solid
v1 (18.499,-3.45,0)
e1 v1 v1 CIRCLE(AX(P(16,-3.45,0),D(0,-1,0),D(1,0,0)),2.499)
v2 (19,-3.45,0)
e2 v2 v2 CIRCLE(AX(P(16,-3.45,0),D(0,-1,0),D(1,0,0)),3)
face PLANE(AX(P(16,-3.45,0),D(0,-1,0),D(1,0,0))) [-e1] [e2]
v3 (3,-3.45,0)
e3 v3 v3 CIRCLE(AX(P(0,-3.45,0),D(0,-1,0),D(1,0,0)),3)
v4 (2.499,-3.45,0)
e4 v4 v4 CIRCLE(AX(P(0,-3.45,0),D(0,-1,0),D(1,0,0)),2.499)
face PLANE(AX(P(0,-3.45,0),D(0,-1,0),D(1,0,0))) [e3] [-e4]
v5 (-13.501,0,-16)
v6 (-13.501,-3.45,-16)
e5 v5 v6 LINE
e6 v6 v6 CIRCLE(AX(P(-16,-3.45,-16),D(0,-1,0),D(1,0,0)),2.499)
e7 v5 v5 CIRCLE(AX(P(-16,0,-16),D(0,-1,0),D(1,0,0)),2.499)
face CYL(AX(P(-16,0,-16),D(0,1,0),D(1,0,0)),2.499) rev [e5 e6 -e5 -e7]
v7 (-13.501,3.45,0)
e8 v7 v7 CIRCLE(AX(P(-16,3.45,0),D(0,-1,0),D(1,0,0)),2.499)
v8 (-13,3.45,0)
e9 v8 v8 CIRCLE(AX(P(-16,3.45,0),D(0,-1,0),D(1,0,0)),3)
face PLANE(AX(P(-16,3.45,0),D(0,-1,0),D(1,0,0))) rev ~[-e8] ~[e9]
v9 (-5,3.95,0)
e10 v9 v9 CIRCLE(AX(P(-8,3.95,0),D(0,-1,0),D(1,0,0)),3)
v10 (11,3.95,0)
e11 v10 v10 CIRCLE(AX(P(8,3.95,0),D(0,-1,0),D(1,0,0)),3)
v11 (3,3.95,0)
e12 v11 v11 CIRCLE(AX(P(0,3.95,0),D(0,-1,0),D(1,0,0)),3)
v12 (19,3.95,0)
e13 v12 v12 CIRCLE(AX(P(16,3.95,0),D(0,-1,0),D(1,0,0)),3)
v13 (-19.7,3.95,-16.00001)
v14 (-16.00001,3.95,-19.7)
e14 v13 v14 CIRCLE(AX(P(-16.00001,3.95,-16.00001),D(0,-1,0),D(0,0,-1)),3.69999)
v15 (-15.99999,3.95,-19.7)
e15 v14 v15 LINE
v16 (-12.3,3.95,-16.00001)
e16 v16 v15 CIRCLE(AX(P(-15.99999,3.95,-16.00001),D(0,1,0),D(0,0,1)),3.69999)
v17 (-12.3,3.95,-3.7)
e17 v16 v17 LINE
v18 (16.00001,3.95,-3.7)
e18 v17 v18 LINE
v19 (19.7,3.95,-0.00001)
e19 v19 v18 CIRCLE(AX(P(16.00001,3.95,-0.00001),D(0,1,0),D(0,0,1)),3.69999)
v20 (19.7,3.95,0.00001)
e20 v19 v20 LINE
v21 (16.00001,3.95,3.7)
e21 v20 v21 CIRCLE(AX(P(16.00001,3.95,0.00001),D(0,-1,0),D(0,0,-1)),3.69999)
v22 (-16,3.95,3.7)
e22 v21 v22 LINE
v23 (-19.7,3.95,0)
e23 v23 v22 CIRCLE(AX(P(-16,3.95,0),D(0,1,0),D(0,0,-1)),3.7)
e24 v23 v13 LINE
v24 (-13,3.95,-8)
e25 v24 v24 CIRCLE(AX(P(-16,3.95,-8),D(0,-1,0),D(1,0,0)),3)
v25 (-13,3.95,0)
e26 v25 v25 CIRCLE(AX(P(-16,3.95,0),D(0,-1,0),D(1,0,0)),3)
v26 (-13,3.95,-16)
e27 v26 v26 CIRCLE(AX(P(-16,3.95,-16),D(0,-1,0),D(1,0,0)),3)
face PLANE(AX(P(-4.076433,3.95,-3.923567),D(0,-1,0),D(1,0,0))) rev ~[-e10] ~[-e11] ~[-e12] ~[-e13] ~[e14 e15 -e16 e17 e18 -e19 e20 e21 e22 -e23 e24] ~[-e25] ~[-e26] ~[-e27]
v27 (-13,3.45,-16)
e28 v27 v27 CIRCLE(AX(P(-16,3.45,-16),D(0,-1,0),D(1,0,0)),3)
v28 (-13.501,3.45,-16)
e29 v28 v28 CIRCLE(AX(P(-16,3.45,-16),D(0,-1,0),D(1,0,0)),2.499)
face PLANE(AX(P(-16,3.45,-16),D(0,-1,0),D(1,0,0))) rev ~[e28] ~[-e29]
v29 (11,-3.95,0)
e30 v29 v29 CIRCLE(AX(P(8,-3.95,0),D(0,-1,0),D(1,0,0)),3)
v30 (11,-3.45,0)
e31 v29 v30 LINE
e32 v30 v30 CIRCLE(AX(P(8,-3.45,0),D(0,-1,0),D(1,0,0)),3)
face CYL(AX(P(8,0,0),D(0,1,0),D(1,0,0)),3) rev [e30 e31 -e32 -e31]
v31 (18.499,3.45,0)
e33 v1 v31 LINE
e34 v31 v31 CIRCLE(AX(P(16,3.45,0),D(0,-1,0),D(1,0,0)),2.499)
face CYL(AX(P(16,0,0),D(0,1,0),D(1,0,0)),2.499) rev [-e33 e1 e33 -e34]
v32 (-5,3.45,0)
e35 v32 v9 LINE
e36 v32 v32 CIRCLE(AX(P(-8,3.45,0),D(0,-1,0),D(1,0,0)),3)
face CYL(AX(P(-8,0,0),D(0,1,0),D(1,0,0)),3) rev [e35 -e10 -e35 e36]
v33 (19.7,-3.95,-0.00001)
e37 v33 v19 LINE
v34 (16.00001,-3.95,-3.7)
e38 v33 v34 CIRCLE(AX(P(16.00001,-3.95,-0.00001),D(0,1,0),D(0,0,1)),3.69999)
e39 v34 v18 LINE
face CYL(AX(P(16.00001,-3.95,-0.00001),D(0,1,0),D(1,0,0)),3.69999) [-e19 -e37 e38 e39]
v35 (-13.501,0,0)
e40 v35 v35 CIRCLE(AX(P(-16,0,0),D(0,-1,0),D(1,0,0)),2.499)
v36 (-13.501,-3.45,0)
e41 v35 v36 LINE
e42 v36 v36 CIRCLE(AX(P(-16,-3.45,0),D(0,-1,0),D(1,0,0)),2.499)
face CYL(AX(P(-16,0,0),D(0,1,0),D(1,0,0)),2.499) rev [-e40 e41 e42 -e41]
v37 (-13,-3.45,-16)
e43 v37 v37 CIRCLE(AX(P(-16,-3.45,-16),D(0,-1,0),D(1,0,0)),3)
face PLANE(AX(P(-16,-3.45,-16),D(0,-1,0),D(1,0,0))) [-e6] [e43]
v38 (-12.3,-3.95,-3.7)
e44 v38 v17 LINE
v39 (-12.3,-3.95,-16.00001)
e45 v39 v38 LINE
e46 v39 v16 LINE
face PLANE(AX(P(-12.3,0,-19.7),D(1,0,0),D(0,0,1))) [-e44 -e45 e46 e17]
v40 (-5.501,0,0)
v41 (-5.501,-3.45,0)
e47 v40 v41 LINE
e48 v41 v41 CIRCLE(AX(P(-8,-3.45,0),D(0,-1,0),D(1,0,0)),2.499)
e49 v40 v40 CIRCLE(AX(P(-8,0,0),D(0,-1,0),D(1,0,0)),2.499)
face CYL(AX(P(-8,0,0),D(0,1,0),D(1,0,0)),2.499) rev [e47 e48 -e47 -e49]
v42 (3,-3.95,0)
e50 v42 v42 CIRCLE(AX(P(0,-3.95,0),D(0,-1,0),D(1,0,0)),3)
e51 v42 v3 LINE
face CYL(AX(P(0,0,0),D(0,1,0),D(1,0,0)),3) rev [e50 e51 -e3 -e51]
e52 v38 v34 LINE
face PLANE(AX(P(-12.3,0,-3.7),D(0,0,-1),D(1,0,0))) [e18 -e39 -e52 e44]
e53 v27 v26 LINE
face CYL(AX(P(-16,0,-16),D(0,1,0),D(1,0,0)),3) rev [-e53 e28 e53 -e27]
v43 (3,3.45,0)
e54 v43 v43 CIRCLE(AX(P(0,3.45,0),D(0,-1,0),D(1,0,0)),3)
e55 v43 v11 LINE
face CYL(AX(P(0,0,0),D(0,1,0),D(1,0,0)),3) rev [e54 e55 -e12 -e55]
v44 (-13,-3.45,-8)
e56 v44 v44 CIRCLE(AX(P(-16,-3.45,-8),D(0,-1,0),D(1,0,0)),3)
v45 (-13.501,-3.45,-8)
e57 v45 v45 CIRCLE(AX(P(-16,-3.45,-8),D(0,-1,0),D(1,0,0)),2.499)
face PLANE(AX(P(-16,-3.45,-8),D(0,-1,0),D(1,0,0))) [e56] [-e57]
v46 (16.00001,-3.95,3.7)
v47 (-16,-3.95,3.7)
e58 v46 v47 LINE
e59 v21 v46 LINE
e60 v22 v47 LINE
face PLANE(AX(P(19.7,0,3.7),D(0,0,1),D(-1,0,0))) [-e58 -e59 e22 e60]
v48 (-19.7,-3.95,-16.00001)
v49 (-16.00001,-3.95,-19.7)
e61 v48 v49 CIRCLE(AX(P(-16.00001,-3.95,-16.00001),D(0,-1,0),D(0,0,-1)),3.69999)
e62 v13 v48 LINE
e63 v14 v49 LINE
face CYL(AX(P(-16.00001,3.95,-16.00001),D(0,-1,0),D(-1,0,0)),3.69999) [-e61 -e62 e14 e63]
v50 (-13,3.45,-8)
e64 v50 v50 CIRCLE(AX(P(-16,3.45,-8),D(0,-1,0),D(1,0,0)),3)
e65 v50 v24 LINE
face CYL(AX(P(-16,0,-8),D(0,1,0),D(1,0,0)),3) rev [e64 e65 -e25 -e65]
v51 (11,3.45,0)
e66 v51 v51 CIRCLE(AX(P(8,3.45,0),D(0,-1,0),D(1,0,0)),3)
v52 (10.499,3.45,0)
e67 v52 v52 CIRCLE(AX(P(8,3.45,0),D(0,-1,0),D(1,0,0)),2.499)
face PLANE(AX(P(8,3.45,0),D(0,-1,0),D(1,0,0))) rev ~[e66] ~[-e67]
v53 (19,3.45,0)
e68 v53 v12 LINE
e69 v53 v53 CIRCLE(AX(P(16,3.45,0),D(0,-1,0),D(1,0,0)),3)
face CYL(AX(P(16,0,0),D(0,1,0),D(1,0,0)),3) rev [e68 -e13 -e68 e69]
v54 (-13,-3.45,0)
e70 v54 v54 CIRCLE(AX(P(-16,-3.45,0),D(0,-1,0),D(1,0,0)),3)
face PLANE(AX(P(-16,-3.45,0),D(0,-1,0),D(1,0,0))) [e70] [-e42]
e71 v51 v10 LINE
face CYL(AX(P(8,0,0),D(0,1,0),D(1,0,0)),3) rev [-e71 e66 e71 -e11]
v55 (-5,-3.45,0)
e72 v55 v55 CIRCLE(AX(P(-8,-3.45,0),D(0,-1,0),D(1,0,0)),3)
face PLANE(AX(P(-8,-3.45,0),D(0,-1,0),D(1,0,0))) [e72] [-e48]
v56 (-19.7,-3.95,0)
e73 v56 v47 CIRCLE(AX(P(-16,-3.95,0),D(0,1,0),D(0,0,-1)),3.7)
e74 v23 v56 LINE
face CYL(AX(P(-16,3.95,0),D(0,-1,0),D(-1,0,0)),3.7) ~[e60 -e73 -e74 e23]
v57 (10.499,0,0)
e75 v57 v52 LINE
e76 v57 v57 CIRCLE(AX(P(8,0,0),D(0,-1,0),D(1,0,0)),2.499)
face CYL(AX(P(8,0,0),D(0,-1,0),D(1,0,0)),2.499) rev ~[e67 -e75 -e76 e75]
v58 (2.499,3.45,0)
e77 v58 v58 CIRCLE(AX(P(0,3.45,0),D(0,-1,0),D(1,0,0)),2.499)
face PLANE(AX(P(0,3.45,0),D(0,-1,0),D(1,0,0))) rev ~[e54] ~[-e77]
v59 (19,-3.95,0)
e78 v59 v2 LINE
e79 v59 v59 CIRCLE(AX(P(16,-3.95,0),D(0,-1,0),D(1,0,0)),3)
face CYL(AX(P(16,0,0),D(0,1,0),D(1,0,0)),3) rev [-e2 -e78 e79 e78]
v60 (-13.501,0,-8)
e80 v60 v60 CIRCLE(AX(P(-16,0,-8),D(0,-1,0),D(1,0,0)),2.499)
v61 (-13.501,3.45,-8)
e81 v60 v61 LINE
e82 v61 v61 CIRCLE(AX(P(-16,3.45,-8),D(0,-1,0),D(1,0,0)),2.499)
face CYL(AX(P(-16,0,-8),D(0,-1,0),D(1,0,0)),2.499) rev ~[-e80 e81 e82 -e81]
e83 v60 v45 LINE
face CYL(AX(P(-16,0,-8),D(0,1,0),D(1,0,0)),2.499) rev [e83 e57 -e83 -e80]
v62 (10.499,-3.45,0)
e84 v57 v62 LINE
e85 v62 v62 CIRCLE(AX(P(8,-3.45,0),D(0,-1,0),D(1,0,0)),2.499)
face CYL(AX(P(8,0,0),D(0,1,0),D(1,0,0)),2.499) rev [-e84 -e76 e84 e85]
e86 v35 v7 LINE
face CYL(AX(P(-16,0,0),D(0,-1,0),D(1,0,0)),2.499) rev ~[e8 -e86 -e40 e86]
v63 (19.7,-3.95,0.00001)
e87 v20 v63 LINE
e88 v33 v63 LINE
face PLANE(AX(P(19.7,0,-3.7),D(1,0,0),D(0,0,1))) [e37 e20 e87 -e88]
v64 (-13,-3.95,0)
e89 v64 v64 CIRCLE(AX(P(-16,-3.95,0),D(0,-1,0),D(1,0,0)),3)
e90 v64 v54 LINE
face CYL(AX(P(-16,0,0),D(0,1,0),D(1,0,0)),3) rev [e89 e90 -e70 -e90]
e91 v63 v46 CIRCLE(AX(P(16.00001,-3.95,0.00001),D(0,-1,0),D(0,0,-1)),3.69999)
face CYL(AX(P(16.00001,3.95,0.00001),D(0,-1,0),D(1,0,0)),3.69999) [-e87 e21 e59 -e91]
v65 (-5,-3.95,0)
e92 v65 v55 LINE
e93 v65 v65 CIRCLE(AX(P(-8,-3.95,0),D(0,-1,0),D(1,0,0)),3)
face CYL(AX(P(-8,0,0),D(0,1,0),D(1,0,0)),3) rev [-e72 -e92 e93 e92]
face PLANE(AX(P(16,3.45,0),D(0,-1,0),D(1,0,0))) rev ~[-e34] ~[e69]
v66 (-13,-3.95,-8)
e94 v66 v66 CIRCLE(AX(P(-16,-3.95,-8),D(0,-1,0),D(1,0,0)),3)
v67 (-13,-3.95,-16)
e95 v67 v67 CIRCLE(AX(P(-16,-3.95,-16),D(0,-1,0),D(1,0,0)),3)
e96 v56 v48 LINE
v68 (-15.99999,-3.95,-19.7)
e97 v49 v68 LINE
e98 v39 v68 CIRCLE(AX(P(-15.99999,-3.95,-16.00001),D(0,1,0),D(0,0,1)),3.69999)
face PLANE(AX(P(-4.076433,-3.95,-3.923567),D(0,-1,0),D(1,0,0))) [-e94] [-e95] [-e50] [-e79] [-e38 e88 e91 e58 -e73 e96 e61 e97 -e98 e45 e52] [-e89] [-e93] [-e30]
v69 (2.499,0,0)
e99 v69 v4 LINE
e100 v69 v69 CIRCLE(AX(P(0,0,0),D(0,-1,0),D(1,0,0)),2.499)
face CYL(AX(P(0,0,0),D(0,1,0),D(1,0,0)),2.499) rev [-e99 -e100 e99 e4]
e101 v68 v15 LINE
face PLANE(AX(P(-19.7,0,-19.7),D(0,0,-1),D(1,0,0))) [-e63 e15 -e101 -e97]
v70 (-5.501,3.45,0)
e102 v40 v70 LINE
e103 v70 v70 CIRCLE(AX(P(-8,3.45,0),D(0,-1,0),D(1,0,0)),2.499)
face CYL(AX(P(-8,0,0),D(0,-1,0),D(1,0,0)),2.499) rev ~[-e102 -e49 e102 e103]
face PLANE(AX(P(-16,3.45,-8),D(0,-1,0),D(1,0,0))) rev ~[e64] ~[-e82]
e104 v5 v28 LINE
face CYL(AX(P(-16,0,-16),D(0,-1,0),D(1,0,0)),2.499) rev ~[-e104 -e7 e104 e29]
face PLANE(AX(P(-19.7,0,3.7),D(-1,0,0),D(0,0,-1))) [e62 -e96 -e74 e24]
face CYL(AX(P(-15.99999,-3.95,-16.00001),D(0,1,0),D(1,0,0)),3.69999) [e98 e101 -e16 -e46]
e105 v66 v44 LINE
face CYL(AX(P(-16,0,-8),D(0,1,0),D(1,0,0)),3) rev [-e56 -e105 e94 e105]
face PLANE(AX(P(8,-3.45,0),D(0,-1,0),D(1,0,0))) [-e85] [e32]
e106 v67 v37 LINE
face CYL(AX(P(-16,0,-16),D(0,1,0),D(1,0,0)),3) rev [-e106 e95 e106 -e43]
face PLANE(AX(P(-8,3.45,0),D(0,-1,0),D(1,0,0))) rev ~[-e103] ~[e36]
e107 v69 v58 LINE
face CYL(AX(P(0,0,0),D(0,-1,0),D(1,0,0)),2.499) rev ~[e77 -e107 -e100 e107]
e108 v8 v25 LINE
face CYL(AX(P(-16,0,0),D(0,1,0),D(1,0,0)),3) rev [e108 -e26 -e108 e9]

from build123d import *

# Parameters (mm, degrees)
F0_R     = 3
F1_DEPTH = 3.95
F0_R_2   = 2.499
F2_DEPTH = 3.45
F3_R     = 3.69999
F4_R     = 3
F4_W     = 7.4
F4_H     = 7.4
F5_DEPTH = 7.9
F7_R     = 3.69999
F8_R     = 3.7


# Not quite as in the source:
# - a fillet or chamfer is up to 0.001 mm smaller than in the source, because OpenCascade refuses the exact size


with BuildPart() as f1:
    # F0 (on Front) → F1 (new body, symmetric)
    with BuildSketch(Plane.XZ):
        Polygon((19.7, -3.7), (19.7, 3.7), (-19.7, 3.7), (-19.7, -3.7), (-19.7, -19.7), (-12.3, -19.7), (-12.3, -3.7), align=None)
        with Locations((-16, -16)):
            Circle(F0_R, mode=Mode.SUBTRACT)
        with Locations((-16, -8)):
            Circle(F0_R, mode=Mode.SUBTRACT)
        with Locations((-16, 0)):
            Circle(F0_R, mode=Mode.SUBTRACT)
        with Locations((-8, 0)):
            Circle(F0_R, mode=Mode.SUBTRACT)
        Circle(F0_R, mode=Mode.SUBTRACT)
        with Locations((8, 0)):
            Circle(F0_R, mode=Mode.SUBTRACT)
        with Locations((16, 0)):
            Circle(F0_R, mode=Mode.SUBTRACT)
    extrude(amount=F1_DEPTH, both=True)

    # F0 (on Front) → F2 (join, symmetric)
    with BuildSketch(Plane.XZ):
        with Locations((-16, -16)):
            Circle(F0_R)
        with Locations((-16, -16)):
            Circle(F0_R_2, mode=Mode.SUBTRACT)
        with Locations((-16, -8)):
            Circle(F0_R)
        with Locations((-16, -8)):
            Circle(F0_R_2, mode=Mode.SUBTRACT)
        with Locations((-16, 0)):
            Circle(F0_R)
        with Locations((-16, 0)):
            Circle(F0_R_2, mode=Mode.SUBTRACT)
        with Locations((-8, 0)):
            Circle(F0_R)
        with Locations((-8, 0)):
            Circle(F0_R_2, mode=Mode.SUBTRACT)
        Circle(F0_R)
        Circle(F0_R_2, mode=Mode.SUBTRACT)
        with Locations((8, 0)):
            Circle(F0_R)
        with Locations((8, 0)):
            Circle(F0_R_2, mode=Mode.SUBTRACT)
        with Locations((16, 0)):
            Circle(F0_R)
        with Locations((16, 0)):
            Circle(F0_R_2, mode=Mode.SUBTRACT)
    extrude(amount=F2_DEPTH, both=True)

    # F3 (radius 3.7 in the source; OpenCascade refuses exactly that, so slightly less here)
    f3_edges = [f1.edges().sort_by_distance(p)[0] for p in [
        (19.7, 0, 3.7),
        (19.7, 0, -3.7),
    ]]
    fillet(f3_edges, radius=F3_R)

    # F7 (radius 3.7 in the source; OpenCascade refuses exactly that, so slightly less here)
    f7_edges = [f1.edges().sort_by_distance(p)[0] for p in [
        (-12.3, 0, -19.7),
        (-19.7, 0, -19.7),
    ]]
    fillet(f7_edges, radius=F7_R)

    # F8
    f8_edges = [f1.edges().sort_by_distance(p)[0] for p in [
        (-19.7, 0, 3.7),
    ]]
    fillet(f8_edges, radius=F8_R)


with BuildPart() as f5:
    # F4 (on face) → F5 (new body)
    with BuildSketch(Plane.XZ.offset(3.95)):
        Polygon((-12.3, -19.7), (-12.3, -3.7), (-19.7, -3.7), (-19.7, -12.3), (-19.7, -19.7), align=None)
        with Locations((-16, -16)):
            Circle(F4_R, mode=Mode.SUBTRACT)
        with Locations((-16, -8)):
            Circle(F4_R, mode=Mode.SUBTRACT)
        with Locations((-23.4, -16)):
            Rectangle(F4_W, F4_H)
    extrude(amount=F5_DEPTH)


solid = f1.part
